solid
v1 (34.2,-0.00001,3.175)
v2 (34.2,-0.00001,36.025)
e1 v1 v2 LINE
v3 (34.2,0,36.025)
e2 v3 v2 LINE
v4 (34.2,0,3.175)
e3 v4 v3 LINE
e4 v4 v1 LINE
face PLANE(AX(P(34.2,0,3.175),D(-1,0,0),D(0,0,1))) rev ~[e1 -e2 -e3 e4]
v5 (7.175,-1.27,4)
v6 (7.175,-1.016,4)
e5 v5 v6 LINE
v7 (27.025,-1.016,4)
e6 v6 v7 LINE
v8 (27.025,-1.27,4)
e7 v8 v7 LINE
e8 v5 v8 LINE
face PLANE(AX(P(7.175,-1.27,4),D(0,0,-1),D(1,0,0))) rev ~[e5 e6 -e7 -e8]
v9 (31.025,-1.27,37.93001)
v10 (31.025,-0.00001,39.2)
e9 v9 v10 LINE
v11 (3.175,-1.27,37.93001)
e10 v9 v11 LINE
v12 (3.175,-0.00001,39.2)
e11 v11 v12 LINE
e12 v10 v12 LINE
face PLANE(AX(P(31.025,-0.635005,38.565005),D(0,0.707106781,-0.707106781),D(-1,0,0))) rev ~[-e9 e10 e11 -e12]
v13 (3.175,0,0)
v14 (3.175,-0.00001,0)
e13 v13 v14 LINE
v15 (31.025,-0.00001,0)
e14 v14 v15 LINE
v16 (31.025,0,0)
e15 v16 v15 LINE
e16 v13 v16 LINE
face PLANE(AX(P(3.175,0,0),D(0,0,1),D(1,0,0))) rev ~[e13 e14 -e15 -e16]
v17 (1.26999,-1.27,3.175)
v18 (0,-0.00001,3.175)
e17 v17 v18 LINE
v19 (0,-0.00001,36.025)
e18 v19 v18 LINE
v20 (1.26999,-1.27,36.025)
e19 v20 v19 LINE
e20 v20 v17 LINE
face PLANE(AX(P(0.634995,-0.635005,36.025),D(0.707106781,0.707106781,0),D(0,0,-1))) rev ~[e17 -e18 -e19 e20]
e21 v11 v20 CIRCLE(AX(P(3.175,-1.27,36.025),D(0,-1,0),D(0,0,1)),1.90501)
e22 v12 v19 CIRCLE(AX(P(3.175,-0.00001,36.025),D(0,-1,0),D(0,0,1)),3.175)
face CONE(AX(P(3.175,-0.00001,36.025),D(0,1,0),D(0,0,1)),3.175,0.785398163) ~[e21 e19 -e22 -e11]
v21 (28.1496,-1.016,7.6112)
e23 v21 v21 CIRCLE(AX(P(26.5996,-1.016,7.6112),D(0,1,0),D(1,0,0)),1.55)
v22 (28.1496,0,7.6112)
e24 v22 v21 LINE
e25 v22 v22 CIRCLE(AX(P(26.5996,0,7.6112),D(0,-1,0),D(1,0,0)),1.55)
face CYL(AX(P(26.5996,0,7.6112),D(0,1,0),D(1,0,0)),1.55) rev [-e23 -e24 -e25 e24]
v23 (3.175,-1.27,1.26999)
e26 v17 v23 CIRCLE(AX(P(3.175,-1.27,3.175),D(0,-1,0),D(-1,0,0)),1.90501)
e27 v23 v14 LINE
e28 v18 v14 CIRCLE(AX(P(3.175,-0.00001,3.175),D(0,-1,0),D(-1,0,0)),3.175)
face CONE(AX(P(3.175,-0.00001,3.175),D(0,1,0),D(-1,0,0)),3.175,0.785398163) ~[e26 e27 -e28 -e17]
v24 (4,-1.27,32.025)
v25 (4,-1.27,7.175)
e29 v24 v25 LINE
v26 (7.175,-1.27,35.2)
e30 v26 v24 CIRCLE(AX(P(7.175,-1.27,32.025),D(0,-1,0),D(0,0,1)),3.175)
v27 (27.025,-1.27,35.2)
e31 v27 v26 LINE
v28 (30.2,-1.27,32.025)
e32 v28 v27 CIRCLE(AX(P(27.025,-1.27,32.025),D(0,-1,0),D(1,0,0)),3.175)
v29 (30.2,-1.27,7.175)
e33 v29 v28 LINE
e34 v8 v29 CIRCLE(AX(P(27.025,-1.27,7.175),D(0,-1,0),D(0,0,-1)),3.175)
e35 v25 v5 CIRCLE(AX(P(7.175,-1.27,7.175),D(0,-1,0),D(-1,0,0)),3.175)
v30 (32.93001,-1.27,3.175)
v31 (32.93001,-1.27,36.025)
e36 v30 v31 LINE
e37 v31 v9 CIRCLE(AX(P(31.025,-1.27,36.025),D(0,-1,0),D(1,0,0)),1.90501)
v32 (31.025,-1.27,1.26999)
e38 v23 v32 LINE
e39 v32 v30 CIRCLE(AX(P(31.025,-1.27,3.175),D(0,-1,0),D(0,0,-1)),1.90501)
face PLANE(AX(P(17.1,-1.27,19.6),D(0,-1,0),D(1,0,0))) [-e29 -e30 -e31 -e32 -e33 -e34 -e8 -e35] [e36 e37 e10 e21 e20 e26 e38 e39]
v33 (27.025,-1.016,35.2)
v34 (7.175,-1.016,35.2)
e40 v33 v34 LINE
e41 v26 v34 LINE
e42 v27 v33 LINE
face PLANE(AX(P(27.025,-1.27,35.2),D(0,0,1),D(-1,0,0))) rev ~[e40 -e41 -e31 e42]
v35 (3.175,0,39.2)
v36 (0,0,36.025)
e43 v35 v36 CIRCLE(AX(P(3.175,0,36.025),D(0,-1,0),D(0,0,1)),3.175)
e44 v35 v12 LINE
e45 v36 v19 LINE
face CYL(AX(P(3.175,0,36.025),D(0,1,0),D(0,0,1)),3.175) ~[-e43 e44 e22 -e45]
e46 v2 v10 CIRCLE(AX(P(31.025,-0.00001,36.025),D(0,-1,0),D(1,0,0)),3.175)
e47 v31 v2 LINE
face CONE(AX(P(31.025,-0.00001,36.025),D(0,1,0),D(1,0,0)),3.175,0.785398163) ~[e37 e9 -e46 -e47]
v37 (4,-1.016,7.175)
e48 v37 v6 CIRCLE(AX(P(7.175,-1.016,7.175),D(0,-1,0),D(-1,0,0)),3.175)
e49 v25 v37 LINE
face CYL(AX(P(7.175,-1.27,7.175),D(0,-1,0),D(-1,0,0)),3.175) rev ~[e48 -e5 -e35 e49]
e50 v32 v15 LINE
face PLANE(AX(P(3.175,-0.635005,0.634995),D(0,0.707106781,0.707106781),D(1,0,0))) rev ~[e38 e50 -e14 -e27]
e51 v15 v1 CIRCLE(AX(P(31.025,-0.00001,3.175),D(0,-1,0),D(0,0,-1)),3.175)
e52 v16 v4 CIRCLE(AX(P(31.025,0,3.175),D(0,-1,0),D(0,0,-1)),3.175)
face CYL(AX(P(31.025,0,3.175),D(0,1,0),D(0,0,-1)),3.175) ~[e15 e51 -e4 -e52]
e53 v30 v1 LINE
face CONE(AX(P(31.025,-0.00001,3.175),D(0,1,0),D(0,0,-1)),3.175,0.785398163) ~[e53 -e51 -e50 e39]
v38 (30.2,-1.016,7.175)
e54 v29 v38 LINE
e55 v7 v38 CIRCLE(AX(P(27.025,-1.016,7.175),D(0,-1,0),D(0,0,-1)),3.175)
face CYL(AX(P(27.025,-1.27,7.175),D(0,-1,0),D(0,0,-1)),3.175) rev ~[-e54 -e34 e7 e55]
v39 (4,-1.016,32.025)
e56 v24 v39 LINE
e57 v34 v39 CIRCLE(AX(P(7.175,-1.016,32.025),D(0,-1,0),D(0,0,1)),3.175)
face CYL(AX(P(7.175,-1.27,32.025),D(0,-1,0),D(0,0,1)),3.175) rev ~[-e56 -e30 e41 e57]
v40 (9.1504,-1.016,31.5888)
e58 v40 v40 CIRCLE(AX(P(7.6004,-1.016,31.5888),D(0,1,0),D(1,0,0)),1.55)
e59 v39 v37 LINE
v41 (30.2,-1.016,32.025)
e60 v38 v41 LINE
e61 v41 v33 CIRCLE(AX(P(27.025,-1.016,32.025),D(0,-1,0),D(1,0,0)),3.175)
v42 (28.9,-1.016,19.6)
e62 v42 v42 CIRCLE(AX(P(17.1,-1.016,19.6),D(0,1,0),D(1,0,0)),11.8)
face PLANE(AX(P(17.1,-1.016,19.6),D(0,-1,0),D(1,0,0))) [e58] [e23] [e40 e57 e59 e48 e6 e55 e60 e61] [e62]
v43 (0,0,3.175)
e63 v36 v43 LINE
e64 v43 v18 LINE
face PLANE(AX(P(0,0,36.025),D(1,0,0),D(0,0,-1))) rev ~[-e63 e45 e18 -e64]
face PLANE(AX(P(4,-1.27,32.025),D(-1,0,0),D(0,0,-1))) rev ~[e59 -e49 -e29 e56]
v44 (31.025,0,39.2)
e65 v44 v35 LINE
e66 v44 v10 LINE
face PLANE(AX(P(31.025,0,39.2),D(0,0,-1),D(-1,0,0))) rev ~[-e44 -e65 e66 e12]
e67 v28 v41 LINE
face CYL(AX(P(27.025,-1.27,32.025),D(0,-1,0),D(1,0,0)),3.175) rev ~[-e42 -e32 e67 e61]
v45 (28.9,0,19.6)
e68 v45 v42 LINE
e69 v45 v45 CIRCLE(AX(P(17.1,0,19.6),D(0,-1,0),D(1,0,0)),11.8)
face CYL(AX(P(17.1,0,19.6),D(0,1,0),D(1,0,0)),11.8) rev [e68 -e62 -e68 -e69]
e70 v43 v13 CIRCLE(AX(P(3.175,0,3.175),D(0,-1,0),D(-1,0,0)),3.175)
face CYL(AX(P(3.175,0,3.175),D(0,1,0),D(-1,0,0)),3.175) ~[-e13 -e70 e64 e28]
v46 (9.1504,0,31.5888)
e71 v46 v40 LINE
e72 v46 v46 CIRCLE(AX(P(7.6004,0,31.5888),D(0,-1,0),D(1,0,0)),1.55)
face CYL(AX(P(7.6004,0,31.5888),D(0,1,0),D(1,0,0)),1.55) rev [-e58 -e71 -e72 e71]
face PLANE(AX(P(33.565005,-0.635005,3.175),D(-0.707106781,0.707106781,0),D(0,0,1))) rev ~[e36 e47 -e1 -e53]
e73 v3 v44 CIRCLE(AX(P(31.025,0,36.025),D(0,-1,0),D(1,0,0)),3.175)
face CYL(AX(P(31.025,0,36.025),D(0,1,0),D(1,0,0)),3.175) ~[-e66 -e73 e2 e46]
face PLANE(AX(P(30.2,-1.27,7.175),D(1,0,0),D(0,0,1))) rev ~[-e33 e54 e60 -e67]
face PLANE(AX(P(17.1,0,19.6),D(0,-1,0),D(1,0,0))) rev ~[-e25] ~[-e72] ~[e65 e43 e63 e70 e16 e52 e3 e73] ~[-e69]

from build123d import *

# Parameters (mm, degrees)
F0_R     = 1.55
F0_R_2   = 11.8
F1_DEPTH = 1.27
F3_DEPTH = 0.254
F4_SIZE  = 1.26999


# Not quite as in the source:
# - a fillet or chamfer is up to 0.001 mm smaller than in the source, because OpenCascade refuses the exact size


with BuildPart() as f1:
    # F0 (on Front) → F1 (new body)
    with BuildSketch(Plane.XZ):
        with BuildLine():
            ThreePointArc((0, 3.175), (0.9299359697, 0.9299359697), (3.175, 0))
            Line((3.175, 0), (31.025, 0))
            ThreePointArc((31.025, 0), (33.2700640303, 0.9299359697), (34.2, 3.175))
            Line((34.2, 3.175), (34.2, 36.025))
            ThreePointArc((34.2, 36.025), (33.2700640303, 38.2700640303), (31.025, 39.2))
            Line((31.025, 39.2), (3.175, 39.2))
            ThreePointArc((3.175, 39.2), (0.9299359697, 38.2700640303), (0, 36.025))
            Line((0, 36.025), (0, 3.175))
        make_face()
        with Locations((26.5996, 7.6112)):
            Circle(F0_R, mode=Mode.SUBTRACT)
        with Locations((7.6004, 31.5888)):
            Circle(F0_R, mode=Mode.SUBTRACT)
        with Locations((17.1, 19.6)):
            Circle(F0_R_2, mode=Mode.SUBTRACT)
    extrude(amount=F1_DEPTH)

    # F2 (on face) → F3 (cut)
    with BuildSketch(Plane.XZ.offset(1.27)):
        with BuildLine():
            Line((27.025, 35.2), (7.175, 35.2))
            ThreePointArc((7.175, 35.2), (4.9299359697, 34.2700640303), (4, 32.025))
            Line((4, 32.025), (4, 7.175))
            ThreePointArc((4, 7.175), (4.9299359697, 4.9299359697), (7.175, 4))
            Line((7.175, 4), (27.025, 4))
            ThreePointArc((27.025, 4), (29.2700640303, 4.9299359697), (30.2, 7.175))
            Line((30.2, 7.175), (30.2, 32.025))
            ThreePointArc((30.2, 32.025), (29.2700640303, 34.2700640303), (27.025, 35.2))
        make_face()
    extrude(amount=-F3_DEPTH, mode=Mode.SUBTRACT)

    # F4 (size 1.27 in the source; OpenCascade refuses exactly that, so slightly less here)
    f4_edges = [f1.edges().sort_by_distance(p)[0] for p in [
        (34.2, -1.27, 19.6),
    ]]
    chamfer(f4_edges, length=F4_SIZE)


solid = f1.part
